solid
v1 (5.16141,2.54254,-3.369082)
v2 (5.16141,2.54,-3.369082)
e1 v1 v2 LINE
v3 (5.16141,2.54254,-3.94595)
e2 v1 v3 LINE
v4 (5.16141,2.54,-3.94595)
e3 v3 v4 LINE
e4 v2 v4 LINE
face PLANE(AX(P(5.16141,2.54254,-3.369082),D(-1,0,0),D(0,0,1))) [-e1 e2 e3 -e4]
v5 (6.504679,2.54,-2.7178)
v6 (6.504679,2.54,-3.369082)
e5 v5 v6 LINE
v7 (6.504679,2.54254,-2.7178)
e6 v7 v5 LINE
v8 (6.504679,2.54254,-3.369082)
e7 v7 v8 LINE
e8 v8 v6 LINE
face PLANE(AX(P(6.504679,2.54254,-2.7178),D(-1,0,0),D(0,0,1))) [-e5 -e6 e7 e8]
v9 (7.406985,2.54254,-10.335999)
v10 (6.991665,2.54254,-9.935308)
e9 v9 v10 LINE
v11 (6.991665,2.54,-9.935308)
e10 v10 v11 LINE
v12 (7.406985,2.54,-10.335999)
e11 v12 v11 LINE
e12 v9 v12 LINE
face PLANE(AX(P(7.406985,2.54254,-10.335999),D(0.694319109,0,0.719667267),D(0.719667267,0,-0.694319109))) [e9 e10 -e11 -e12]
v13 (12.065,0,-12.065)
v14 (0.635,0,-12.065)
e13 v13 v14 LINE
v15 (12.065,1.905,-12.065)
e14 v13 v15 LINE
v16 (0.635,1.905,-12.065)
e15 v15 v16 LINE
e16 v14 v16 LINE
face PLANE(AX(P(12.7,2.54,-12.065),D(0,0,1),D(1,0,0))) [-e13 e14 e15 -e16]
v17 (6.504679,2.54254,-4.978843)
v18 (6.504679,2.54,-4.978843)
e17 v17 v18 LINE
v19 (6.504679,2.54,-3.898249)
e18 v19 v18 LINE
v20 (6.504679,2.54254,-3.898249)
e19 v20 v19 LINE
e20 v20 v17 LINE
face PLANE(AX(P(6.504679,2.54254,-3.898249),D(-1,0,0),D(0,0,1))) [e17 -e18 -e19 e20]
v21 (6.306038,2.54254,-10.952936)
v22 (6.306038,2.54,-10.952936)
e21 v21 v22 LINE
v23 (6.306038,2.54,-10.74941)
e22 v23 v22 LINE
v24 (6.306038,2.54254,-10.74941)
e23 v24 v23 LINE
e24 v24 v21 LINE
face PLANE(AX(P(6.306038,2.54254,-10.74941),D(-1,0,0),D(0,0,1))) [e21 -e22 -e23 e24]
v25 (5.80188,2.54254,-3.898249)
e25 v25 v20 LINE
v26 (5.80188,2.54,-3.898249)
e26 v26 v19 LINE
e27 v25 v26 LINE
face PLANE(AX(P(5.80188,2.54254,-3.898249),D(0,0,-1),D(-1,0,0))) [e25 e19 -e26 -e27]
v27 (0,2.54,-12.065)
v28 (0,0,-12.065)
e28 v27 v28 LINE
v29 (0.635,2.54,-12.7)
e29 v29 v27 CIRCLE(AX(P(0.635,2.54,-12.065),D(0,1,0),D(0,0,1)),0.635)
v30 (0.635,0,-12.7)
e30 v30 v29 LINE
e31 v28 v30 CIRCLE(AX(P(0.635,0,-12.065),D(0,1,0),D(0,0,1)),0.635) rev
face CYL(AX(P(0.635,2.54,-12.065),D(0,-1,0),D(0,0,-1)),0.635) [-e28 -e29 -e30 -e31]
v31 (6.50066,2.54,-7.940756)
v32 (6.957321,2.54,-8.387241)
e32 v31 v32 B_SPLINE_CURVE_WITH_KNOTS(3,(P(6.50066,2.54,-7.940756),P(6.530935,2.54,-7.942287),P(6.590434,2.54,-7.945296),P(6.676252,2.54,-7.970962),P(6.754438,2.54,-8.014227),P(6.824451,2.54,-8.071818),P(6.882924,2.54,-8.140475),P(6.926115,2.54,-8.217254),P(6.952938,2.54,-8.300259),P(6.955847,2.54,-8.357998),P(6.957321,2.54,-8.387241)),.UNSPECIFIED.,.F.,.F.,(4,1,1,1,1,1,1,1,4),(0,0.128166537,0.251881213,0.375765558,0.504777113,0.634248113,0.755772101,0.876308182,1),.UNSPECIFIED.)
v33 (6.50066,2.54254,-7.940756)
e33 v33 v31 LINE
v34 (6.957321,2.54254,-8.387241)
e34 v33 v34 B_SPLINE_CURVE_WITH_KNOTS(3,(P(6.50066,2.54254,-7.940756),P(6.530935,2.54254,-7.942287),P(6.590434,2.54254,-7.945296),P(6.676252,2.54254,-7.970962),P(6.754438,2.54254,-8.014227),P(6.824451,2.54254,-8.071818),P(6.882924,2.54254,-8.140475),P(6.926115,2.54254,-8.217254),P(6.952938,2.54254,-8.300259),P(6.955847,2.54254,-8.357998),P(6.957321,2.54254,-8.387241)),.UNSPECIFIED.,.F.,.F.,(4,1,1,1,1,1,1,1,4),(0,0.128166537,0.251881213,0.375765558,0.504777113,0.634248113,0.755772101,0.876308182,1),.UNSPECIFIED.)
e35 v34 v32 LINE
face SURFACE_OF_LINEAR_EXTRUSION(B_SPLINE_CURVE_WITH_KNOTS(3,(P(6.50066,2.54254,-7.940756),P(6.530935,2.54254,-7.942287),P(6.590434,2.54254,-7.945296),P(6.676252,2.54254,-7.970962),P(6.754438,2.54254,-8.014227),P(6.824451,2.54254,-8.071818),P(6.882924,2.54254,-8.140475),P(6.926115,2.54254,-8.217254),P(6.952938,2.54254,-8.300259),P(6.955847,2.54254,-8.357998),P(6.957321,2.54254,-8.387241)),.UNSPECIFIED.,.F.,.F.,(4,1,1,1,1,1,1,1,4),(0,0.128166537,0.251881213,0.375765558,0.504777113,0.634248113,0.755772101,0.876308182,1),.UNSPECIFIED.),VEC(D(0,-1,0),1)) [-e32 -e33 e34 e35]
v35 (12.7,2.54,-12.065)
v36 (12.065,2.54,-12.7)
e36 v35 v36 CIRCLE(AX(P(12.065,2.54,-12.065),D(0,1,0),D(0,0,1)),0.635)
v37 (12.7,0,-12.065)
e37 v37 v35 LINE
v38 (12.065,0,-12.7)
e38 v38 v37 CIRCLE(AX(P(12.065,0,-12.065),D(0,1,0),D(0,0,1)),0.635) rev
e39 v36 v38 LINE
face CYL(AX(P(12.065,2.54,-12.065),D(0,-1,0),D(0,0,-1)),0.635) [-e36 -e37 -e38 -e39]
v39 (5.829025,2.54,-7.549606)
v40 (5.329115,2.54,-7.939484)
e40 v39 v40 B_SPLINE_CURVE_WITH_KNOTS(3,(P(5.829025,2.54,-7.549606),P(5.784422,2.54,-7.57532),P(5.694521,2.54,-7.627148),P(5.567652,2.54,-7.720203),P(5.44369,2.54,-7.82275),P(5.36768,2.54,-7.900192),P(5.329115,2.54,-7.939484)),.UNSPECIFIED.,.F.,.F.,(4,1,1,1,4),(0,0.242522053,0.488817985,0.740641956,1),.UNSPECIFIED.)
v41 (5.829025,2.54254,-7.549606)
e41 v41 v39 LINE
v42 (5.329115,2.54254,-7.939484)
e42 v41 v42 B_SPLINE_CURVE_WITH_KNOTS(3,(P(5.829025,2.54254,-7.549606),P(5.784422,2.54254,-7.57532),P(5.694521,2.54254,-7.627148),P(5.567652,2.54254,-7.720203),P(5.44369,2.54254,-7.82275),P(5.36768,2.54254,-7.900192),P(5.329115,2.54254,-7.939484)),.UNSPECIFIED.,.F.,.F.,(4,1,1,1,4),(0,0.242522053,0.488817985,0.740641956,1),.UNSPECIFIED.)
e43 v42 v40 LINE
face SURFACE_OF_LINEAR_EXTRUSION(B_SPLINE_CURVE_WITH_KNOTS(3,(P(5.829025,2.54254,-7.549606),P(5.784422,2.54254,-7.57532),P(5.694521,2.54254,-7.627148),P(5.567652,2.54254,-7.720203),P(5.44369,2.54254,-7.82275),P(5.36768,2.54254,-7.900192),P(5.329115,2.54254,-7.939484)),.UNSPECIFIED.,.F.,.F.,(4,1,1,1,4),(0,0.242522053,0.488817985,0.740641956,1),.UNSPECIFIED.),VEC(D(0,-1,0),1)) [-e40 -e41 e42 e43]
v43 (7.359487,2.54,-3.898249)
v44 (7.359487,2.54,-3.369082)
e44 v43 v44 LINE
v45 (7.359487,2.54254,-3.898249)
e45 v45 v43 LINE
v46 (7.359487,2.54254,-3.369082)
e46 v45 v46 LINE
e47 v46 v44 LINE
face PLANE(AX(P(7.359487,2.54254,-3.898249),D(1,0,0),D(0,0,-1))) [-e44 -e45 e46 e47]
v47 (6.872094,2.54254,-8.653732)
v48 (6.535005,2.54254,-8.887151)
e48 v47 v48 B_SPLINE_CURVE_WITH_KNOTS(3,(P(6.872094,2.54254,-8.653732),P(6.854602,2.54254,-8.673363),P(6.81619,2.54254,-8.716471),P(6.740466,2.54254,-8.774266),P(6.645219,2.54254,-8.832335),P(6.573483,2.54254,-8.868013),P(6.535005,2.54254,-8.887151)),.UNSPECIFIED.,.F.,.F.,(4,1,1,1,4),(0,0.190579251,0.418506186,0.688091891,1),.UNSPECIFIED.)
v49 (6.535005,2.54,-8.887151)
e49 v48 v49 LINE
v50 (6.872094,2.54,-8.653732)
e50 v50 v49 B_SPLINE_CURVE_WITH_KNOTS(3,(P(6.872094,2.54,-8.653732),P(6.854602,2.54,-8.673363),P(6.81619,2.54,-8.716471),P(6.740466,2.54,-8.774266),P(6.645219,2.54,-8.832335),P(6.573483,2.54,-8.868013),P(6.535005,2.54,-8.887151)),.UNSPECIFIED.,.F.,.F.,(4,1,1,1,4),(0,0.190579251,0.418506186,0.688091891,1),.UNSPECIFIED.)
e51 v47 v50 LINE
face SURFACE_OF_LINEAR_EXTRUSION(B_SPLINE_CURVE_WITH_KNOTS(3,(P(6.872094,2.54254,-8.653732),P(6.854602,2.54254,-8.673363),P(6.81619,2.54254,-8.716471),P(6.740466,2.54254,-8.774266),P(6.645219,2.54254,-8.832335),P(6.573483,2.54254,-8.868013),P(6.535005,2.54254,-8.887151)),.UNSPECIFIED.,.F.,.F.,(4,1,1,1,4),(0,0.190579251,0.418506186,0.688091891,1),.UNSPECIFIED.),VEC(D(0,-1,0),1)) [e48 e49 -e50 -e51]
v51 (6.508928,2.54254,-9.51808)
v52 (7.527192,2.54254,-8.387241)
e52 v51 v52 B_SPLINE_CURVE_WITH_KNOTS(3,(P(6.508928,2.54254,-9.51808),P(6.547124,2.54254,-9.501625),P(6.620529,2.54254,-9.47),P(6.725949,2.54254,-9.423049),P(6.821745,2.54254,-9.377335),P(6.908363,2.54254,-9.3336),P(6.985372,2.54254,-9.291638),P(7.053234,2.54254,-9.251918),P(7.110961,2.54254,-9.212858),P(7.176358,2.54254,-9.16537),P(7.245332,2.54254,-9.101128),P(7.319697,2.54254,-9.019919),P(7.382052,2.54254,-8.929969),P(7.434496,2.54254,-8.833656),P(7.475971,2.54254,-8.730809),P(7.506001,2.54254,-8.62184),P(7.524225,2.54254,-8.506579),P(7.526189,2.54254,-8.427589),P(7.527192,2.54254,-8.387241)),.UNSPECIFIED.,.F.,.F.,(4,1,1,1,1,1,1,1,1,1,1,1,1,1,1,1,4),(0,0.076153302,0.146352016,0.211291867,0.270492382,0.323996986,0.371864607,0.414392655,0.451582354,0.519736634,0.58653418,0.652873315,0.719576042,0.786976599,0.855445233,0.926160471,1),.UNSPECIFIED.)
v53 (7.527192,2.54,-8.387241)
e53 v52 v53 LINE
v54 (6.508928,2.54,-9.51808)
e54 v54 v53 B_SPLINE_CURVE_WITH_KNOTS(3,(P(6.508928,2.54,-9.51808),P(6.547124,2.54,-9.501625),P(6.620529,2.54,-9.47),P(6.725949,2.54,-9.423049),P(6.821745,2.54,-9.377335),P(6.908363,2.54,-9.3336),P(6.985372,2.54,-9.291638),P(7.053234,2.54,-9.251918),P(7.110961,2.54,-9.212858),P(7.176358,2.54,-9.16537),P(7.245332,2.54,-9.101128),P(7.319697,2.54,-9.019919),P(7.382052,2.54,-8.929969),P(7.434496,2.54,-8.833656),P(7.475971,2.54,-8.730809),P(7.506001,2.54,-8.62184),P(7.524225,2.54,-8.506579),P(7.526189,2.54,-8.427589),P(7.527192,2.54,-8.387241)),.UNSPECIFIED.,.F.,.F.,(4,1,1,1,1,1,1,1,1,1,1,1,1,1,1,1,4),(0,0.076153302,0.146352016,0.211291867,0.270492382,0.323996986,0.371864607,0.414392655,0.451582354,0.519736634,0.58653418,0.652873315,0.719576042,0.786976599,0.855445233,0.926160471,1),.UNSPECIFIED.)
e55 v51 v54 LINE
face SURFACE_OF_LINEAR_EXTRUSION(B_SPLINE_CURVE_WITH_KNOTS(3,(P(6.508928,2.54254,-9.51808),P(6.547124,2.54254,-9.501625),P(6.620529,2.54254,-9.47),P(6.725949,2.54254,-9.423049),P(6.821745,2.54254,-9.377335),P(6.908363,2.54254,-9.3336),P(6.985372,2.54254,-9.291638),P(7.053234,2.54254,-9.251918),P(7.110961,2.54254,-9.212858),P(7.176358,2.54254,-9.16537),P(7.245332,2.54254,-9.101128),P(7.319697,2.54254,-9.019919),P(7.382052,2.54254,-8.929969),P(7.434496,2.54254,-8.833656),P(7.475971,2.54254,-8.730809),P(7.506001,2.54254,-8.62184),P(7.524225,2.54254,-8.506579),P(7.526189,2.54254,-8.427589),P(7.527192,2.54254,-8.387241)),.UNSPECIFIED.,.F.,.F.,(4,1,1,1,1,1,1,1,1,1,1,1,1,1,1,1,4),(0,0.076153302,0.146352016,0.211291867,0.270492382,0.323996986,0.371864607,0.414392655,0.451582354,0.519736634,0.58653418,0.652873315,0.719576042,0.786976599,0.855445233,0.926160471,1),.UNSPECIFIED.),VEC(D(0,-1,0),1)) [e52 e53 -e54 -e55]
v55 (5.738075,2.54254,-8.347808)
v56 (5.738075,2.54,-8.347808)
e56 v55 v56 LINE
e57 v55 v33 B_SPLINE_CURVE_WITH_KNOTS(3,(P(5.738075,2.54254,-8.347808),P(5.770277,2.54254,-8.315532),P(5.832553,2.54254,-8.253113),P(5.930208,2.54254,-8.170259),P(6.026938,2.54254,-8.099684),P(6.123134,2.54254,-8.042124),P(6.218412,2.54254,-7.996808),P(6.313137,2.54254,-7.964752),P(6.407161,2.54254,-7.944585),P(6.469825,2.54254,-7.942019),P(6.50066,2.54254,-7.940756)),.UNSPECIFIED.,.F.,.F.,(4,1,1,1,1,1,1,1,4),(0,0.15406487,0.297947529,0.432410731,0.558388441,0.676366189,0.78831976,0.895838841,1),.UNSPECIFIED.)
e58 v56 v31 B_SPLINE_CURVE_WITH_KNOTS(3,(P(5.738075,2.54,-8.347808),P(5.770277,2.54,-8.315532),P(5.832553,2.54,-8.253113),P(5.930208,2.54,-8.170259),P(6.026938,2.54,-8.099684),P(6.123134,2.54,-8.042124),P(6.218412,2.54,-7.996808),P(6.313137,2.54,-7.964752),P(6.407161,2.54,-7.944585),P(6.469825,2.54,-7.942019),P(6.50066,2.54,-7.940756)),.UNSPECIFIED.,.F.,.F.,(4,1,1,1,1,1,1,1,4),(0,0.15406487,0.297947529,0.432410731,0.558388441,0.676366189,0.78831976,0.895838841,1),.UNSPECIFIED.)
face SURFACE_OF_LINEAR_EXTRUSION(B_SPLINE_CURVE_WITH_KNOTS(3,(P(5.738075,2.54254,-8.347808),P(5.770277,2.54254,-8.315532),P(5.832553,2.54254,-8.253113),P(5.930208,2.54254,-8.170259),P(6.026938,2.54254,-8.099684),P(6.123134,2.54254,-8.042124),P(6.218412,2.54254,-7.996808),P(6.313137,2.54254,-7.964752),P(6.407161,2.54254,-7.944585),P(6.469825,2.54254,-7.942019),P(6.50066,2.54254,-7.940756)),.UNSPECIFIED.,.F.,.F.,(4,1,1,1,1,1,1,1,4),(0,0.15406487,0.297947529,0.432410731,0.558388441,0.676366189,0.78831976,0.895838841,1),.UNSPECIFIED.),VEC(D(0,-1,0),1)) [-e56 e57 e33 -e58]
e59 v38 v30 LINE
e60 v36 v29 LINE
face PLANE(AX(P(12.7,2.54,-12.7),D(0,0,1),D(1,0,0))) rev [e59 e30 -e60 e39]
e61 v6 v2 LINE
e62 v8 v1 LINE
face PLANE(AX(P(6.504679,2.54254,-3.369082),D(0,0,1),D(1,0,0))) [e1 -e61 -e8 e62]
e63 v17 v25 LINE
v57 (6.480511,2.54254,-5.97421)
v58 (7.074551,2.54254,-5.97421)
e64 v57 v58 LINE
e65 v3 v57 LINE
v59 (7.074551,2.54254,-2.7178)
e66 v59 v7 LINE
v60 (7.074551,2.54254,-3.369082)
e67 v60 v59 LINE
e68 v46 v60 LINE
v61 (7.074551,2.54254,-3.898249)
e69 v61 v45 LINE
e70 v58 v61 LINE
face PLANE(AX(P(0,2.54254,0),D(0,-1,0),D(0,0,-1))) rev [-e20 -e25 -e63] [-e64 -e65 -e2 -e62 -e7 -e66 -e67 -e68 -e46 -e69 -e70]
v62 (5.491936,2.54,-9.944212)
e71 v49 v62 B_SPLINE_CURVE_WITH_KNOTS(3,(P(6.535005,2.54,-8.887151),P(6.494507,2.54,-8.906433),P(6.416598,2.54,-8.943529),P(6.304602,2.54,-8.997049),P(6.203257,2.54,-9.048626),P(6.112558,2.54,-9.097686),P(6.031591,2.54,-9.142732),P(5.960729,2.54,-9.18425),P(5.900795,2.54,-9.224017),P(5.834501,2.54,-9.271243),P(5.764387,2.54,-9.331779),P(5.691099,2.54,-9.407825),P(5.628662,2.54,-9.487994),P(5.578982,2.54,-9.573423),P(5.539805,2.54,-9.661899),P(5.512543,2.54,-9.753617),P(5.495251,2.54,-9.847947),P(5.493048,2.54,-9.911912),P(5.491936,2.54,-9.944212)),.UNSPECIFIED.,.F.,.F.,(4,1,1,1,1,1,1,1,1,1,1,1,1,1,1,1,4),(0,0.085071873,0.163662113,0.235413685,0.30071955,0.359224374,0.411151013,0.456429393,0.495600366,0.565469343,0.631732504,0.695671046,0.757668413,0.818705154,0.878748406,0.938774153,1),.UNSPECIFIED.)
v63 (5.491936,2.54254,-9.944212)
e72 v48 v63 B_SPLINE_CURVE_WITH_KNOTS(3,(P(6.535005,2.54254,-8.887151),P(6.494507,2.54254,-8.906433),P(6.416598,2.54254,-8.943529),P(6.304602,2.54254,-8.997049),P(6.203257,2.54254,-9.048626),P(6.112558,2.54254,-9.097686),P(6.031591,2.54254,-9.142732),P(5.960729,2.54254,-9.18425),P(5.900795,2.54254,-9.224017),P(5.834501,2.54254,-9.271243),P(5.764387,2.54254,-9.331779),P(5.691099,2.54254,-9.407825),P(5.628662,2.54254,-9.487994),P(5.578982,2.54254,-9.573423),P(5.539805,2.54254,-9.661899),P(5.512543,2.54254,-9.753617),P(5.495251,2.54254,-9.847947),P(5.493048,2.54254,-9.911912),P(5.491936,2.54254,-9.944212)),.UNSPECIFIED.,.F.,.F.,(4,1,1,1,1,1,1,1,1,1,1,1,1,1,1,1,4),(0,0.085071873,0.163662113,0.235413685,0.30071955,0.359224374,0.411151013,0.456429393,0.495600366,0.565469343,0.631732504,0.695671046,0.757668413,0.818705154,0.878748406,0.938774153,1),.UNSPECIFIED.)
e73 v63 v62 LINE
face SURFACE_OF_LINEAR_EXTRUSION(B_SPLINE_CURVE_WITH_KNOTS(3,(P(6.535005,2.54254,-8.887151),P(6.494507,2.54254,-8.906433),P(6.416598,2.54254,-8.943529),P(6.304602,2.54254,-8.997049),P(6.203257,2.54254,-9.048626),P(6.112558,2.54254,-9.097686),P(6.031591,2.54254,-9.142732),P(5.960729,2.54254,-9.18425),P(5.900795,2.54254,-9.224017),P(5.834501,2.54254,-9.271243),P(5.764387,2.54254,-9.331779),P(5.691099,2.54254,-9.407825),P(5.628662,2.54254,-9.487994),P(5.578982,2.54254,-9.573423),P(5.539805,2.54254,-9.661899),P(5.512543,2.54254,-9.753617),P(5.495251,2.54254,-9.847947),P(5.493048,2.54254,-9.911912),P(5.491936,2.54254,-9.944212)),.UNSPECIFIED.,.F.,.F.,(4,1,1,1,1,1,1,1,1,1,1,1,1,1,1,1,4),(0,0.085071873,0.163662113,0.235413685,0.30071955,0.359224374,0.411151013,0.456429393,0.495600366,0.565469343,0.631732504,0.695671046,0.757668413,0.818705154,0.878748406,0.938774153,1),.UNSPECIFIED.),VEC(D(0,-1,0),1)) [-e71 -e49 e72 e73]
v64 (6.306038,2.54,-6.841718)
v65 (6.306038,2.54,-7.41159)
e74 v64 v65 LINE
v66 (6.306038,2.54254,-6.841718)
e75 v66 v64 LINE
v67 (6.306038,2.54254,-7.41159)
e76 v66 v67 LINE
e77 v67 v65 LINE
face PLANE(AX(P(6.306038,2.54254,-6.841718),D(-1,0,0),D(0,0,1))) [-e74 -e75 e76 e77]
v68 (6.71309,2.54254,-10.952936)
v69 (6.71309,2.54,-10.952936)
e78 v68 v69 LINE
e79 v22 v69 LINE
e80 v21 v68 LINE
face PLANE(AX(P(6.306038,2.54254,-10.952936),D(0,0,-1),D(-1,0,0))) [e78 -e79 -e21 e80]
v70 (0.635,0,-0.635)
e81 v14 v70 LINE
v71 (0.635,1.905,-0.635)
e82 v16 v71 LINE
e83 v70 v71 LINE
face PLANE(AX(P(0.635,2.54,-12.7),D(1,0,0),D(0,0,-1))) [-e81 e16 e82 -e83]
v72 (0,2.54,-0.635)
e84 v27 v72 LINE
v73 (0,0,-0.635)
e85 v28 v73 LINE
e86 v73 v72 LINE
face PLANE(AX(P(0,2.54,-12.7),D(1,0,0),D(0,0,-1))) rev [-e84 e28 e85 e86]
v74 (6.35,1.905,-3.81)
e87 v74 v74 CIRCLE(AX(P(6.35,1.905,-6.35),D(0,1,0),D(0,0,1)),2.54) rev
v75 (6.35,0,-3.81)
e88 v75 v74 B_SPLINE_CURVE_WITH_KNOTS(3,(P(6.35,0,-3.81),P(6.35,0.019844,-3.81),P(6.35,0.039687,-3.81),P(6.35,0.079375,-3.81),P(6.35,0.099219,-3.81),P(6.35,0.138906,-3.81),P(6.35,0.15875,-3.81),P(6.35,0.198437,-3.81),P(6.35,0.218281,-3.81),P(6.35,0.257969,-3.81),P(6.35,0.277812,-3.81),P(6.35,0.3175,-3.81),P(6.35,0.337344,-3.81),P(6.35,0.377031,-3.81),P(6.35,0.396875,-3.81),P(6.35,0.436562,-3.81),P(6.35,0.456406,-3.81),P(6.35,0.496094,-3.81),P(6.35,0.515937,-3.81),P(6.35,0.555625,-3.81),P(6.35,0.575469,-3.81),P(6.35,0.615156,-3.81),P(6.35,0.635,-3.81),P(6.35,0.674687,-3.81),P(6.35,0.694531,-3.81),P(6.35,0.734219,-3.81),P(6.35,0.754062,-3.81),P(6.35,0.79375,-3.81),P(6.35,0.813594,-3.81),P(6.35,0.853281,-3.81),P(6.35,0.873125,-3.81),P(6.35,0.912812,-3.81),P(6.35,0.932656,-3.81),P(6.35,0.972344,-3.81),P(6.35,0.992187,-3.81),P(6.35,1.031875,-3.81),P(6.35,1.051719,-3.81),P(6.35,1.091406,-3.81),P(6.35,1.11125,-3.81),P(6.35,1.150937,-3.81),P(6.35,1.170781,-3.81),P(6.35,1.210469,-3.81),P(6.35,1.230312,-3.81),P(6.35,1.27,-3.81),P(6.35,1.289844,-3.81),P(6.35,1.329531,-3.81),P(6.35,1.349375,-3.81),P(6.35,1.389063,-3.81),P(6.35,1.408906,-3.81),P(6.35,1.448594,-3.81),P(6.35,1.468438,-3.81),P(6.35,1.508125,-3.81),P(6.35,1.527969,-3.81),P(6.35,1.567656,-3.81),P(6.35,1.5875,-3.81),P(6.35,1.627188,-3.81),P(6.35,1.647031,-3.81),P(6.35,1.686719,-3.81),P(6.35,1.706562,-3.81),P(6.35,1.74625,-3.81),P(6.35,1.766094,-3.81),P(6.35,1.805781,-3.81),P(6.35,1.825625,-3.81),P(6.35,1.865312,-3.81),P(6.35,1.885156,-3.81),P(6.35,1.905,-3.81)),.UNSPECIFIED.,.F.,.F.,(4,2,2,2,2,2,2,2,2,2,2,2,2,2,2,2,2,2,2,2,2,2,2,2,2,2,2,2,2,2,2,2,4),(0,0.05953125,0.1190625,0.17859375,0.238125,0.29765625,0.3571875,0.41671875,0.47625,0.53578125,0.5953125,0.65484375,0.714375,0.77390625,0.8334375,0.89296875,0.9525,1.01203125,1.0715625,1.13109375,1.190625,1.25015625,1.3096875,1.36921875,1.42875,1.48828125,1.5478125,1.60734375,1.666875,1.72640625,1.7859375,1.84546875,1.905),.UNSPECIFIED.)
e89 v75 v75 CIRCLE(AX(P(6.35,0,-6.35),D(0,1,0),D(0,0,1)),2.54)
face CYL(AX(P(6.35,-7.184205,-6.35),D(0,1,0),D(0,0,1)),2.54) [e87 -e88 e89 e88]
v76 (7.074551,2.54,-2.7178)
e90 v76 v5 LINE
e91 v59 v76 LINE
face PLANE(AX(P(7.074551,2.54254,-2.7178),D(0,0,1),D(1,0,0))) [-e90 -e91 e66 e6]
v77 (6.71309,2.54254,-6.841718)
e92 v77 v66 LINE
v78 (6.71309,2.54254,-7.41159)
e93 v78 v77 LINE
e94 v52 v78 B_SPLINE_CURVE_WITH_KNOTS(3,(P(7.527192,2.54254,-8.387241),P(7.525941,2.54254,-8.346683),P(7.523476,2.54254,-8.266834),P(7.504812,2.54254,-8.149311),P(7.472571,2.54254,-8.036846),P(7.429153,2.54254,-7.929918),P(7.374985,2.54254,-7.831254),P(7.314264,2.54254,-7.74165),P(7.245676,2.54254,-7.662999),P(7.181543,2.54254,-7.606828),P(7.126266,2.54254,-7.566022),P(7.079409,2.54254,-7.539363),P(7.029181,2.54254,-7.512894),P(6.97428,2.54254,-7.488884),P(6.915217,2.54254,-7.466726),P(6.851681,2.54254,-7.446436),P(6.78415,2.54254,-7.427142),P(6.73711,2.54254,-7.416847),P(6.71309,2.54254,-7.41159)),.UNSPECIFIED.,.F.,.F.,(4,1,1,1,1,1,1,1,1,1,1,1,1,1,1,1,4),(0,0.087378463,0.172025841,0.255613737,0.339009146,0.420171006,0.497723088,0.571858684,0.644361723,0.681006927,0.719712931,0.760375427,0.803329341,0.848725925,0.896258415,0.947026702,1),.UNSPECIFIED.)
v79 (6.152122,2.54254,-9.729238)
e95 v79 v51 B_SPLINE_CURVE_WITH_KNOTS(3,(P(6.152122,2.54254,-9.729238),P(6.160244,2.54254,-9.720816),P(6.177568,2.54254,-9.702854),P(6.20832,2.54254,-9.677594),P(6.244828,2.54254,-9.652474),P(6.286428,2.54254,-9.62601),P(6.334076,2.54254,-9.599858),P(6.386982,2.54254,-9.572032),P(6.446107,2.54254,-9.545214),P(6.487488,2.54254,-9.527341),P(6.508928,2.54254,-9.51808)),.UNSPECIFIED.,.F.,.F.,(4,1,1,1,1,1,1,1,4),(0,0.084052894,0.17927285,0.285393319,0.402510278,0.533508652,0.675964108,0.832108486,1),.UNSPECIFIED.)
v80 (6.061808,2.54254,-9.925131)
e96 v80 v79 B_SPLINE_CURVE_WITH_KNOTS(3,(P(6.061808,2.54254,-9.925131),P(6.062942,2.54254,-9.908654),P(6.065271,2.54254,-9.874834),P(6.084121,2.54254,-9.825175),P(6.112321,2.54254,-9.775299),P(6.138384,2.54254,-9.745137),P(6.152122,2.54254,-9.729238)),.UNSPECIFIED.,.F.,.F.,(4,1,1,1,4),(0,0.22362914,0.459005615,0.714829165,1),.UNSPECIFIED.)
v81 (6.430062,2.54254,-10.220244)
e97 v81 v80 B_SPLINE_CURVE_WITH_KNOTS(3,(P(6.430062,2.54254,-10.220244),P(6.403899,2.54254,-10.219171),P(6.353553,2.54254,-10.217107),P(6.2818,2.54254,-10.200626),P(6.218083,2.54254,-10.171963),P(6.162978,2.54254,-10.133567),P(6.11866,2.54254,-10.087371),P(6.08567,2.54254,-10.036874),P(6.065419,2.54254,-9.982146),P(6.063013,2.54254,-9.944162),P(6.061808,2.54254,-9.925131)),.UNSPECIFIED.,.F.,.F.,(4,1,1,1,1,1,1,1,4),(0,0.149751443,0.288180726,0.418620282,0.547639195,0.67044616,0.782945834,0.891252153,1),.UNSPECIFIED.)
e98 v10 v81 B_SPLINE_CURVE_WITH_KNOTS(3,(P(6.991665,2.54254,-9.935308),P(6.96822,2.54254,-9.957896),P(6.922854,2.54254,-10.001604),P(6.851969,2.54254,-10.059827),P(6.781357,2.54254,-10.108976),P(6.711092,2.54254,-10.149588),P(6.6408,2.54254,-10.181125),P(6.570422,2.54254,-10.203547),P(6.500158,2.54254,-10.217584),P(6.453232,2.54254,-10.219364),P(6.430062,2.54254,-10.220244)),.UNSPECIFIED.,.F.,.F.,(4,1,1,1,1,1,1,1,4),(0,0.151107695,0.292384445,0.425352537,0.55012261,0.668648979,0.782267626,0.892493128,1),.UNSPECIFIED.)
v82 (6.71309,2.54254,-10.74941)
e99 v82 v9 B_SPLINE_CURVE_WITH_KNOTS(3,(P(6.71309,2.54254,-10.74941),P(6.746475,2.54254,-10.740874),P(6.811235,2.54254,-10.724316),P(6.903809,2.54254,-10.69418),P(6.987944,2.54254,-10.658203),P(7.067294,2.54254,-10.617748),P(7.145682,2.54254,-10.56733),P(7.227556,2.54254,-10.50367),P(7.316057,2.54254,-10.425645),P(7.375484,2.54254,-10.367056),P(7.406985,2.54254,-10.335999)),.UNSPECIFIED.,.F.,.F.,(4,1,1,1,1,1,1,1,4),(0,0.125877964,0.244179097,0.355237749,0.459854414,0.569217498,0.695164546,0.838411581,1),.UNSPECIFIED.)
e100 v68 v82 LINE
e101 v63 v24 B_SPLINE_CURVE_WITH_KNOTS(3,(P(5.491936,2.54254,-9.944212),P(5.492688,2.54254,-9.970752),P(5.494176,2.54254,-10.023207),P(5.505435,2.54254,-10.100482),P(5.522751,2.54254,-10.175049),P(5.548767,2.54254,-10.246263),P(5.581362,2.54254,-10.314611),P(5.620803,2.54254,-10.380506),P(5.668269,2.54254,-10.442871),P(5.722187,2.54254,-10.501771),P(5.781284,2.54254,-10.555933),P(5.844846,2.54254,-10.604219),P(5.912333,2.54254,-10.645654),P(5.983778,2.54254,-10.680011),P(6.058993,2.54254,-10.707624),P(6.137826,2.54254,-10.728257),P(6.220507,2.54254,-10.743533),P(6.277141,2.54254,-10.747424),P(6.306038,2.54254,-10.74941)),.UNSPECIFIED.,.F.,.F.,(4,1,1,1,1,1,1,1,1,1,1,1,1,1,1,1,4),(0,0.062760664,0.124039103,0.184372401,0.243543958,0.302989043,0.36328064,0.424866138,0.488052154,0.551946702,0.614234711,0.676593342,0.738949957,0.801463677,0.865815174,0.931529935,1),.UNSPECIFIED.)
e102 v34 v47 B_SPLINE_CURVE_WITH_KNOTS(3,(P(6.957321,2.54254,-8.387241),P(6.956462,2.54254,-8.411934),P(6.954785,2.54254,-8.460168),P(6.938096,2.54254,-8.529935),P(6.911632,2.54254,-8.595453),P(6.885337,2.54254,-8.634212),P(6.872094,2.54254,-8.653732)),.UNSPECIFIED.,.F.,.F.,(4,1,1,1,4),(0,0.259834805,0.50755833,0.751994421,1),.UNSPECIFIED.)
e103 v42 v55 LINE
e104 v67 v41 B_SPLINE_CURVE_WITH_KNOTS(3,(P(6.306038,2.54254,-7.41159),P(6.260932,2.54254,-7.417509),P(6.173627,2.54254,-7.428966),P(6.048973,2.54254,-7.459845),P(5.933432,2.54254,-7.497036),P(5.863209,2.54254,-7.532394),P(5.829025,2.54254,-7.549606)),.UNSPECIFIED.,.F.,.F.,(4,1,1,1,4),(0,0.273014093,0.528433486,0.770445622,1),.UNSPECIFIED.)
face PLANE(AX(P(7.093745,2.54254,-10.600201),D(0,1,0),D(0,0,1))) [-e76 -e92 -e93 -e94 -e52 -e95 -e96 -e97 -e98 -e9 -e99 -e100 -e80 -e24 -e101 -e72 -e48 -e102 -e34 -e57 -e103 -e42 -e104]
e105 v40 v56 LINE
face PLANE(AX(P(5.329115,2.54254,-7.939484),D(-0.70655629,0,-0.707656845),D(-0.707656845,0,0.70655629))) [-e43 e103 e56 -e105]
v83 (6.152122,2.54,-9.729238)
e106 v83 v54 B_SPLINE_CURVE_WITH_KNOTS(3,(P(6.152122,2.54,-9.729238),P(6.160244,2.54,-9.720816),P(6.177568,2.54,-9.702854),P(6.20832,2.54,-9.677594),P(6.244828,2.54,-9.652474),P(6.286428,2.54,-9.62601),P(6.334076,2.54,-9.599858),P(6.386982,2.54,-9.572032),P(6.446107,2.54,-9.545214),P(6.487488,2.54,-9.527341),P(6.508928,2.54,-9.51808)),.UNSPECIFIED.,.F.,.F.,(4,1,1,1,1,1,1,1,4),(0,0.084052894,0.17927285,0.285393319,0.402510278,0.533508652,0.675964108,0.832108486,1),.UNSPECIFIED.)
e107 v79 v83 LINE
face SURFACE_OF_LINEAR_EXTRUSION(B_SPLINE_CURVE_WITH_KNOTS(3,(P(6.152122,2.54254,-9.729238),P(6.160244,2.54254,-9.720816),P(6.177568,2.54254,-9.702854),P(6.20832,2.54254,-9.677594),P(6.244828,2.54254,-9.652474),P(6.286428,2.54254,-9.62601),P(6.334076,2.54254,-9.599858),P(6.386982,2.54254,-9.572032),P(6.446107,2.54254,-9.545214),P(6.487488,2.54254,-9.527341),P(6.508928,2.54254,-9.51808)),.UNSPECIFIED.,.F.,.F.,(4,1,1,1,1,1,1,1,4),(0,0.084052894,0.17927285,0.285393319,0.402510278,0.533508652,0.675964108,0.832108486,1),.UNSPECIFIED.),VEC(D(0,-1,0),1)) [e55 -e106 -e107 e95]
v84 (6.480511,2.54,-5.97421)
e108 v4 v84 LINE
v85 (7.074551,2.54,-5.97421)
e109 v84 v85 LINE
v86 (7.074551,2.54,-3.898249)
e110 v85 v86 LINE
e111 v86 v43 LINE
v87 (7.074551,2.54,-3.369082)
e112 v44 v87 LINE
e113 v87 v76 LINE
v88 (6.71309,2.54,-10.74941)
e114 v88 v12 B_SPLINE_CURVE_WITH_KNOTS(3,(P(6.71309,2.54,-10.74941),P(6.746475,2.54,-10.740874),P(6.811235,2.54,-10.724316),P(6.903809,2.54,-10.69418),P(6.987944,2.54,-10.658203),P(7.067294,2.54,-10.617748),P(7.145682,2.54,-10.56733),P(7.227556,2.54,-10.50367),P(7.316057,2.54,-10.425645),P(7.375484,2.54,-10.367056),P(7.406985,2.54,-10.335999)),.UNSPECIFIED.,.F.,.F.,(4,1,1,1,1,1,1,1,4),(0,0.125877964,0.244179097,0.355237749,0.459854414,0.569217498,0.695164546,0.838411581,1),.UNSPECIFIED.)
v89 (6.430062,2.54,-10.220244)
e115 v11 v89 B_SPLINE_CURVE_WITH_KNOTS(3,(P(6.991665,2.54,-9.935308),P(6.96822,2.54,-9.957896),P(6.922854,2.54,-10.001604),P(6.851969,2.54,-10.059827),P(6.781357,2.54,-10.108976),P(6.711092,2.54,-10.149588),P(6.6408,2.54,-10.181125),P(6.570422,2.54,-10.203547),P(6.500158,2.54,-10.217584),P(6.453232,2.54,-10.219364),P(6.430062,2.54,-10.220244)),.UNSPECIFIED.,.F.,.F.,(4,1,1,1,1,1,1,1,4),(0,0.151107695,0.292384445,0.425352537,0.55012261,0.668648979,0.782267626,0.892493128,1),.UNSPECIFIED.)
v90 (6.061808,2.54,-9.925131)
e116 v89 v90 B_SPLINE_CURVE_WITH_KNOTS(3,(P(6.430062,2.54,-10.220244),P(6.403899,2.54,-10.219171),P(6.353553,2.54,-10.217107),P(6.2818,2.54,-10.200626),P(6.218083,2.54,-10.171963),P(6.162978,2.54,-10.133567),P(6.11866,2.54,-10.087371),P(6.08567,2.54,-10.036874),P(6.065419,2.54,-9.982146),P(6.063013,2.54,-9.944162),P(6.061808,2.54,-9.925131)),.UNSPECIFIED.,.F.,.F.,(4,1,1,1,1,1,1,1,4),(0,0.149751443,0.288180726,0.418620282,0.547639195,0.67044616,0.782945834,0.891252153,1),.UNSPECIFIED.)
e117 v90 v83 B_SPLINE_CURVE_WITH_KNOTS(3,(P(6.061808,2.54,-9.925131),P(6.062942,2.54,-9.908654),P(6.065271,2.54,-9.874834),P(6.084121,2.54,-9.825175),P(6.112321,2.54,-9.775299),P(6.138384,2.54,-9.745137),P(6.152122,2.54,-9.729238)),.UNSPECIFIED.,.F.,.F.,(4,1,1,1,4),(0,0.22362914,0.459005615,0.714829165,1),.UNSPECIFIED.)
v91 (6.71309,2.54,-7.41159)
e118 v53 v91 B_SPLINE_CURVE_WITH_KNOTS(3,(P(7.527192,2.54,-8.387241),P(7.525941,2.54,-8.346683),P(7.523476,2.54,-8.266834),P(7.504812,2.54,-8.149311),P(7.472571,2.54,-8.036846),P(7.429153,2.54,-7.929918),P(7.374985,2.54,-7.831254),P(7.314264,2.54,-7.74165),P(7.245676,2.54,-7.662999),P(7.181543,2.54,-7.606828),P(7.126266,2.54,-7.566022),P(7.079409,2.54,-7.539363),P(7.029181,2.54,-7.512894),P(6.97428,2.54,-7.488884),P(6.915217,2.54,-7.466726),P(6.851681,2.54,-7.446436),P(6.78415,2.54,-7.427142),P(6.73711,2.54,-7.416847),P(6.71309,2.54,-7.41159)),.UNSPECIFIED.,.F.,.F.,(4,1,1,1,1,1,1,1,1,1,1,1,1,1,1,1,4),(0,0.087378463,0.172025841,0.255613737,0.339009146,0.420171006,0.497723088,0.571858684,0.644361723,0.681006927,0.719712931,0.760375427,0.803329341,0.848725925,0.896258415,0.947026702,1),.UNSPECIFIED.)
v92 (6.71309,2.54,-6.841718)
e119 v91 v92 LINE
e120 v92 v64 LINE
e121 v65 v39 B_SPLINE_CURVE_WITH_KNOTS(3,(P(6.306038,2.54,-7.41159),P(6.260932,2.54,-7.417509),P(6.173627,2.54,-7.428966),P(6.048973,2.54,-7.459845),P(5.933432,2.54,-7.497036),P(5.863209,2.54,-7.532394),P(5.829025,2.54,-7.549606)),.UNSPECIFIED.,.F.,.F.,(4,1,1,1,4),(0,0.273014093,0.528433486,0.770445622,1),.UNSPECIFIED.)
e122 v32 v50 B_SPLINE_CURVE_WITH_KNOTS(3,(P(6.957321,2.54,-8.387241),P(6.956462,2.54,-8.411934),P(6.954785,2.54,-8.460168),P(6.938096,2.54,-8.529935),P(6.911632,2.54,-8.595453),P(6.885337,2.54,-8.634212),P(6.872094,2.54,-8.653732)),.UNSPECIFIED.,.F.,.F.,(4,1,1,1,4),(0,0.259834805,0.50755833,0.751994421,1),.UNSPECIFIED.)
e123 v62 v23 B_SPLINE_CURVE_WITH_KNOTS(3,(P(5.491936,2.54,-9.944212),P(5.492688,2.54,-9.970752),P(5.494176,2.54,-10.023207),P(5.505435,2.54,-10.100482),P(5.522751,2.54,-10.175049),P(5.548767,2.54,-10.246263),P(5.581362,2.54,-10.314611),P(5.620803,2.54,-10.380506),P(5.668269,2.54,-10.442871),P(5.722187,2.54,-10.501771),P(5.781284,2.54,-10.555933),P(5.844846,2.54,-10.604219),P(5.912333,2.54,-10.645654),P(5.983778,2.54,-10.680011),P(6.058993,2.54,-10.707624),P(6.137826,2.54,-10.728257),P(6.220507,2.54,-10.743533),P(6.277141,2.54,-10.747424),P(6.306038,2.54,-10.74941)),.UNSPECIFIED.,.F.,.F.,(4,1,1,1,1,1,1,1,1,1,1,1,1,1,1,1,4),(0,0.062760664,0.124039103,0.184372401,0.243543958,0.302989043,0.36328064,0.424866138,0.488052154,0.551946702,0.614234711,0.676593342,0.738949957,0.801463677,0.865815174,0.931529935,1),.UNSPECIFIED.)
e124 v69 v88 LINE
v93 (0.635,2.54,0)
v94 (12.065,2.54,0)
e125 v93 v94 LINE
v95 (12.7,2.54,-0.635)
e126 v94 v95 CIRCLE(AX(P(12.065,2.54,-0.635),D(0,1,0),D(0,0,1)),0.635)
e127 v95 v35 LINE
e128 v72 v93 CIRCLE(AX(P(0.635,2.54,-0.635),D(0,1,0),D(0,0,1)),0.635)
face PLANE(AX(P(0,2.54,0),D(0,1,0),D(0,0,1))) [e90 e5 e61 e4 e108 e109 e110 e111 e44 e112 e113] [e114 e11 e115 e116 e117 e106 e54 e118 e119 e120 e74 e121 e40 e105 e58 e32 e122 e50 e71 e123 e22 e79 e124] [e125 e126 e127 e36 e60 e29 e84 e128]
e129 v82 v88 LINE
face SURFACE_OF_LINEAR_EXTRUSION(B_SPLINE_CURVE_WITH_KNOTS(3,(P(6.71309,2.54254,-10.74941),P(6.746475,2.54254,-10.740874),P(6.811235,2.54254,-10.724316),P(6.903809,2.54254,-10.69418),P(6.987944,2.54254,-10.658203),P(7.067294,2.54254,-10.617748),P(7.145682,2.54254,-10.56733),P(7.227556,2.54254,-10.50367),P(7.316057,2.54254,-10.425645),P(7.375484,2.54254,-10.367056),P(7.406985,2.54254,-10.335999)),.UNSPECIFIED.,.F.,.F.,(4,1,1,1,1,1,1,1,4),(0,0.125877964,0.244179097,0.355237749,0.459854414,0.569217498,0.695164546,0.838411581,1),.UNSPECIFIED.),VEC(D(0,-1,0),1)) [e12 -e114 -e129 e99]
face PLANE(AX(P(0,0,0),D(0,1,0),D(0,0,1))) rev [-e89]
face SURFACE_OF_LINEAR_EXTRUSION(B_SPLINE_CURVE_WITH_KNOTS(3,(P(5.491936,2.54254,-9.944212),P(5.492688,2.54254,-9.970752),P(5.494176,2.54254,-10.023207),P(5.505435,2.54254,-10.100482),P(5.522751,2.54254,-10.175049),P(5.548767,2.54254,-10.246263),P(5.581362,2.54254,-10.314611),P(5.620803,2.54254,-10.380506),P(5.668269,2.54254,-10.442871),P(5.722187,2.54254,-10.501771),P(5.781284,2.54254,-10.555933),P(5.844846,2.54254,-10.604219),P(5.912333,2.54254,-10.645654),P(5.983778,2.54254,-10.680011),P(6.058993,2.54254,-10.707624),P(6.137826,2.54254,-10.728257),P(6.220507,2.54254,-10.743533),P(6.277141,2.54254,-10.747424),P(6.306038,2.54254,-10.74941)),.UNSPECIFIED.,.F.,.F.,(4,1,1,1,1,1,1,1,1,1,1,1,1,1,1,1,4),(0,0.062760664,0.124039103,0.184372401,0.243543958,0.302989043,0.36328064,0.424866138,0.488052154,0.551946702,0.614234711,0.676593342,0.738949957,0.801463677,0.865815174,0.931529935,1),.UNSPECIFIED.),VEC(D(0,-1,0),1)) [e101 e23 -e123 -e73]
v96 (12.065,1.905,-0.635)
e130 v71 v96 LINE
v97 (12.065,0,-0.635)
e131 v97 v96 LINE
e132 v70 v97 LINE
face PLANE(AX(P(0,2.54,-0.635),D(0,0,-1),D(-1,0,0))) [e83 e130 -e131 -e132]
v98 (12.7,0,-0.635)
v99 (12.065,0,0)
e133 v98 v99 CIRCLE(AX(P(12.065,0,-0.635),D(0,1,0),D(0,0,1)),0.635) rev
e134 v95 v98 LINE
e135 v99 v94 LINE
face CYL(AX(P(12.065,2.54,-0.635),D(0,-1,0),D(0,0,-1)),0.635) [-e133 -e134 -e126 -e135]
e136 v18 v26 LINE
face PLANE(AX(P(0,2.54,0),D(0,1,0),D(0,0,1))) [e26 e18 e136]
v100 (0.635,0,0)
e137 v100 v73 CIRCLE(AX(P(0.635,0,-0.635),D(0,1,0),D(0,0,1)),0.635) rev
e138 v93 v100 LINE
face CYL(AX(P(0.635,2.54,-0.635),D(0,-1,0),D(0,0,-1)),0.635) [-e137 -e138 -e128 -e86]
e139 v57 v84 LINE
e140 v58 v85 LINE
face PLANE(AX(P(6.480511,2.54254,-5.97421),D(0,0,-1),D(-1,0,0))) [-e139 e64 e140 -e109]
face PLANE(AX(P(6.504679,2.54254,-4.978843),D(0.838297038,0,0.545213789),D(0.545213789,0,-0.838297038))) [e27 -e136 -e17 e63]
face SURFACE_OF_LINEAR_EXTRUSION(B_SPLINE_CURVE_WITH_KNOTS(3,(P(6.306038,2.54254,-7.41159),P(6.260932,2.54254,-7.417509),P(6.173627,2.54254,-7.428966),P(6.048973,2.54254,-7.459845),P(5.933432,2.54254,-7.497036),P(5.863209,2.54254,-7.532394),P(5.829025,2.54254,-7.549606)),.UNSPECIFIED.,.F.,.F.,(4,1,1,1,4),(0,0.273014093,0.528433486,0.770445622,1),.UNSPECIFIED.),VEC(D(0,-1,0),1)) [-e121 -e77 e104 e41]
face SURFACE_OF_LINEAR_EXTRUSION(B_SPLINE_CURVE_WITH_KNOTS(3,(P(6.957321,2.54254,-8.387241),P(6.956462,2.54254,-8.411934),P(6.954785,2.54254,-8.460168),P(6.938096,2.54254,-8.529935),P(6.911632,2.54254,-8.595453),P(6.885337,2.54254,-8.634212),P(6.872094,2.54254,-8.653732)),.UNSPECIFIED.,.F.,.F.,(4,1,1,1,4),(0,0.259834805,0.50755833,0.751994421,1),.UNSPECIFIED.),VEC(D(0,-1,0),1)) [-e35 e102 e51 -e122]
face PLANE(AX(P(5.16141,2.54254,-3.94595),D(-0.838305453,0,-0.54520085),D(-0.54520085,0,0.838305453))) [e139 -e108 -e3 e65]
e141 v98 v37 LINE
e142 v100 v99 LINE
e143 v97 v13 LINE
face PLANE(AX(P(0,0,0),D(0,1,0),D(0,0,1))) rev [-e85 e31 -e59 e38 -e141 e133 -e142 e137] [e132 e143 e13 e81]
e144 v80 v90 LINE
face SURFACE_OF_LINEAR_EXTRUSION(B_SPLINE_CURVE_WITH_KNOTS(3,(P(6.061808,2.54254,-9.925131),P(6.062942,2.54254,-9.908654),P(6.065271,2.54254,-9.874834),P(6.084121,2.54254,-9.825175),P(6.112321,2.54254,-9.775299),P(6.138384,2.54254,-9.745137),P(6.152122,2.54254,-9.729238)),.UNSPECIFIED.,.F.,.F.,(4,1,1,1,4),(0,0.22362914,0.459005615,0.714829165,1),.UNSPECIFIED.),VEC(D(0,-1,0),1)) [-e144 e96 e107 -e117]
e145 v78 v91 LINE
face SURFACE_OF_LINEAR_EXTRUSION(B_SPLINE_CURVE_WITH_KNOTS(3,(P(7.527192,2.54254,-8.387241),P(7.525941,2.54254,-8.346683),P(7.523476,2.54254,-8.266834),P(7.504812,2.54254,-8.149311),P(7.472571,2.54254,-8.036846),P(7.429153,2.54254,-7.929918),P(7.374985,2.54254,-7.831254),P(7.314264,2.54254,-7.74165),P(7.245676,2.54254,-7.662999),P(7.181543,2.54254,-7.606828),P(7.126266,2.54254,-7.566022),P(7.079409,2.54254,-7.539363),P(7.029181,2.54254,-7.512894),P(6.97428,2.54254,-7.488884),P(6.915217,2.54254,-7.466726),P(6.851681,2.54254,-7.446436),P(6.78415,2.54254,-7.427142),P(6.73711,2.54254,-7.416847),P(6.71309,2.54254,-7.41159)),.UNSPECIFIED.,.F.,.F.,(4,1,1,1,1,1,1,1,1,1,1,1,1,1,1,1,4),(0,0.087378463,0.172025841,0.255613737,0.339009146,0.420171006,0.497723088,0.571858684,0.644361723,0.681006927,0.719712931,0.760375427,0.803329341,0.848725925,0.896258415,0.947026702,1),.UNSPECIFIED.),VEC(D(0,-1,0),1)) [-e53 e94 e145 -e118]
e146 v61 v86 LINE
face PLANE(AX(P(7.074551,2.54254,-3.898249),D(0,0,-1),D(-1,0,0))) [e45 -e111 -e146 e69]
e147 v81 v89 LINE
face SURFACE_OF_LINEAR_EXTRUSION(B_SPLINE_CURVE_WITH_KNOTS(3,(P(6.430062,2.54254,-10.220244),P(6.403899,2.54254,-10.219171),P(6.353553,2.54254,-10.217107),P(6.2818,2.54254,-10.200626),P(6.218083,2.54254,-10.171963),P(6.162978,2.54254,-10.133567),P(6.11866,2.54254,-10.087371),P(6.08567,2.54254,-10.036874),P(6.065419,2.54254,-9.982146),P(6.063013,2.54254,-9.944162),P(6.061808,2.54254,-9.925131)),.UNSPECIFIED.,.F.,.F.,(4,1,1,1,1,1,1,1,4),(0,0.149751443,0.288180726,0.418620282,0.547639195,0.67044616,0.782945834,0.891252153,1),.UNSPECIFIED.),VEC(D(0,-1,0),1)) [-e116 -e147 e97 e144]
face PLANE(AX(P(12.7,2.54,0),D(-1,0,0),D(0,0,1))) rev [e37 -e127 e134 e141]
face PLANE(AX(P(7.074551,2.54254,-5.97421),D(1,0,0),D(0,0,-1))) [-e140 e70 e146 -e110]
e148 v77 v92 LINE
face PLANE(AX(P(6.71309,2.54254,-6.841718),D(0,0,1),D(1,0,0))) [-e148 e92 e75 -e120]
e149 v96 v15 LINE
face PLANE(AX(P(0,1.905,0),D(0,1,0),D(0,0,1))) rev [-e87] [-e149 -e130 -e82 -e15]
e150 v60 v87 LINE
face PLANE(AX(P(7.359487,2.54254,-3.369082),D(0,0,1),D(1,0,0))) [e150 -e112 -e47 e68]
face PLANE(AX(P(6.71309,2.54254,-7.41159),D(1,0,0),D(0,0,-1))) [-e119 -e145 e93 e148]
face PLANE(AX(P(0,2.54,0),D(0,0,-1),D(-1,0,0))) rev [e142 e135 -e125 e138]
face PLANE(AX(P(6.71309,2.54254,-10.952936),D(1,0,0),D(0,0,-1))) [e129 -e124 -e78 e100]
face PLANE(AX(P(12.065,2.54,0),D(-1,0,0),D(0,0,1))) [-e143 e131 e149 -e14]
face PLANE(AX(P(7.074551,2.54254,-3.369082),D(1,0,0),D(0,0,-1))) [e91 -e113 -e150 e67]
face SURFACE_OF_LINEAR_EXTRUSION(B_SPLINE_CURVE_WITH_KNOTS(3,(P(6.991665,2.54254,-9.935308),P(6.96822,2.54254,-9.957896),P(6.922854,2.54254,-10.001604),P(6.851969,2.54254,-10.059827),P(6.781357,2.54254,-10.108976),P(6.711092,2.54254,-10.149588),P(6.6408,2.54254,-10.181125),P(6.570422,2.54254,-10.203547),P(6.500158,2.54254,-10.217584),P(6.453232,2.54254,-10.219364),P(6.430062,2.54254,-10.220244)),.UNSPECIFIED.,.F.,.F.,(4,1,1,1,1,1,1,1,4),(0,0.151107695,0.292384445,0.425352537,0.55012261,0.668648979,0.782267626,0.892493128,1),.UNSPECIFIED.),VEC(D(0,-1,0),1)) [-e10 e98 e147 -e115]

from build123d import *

# Parameters (mm, degrees)
SKETCH1_W           = 12.7
SKETCH1_H           = 12.7
BOSS_EXTRUDE1_DEPTH = 2.54
FILLET1_R           = 0.635
SHELL1_START        = 0.635
SHELL1_OUTLINE_W    = 1.905
SHELL1_OUTLINE_H    = 11.43
SHELL1_DEPTH        = 11.43
SKETCH2_R           = 2.54
BOSS_EXTRUDE2_DEPTH = 1.905
BOSS_EXTRUDE4_DEPTH = 0.00254


# Read off the part's stored shape, not the designer's step: Shell1
with BuildPart() as part:
    # Sketch1 → Boss-Extrude1 (new body)
    with BuildSketch(Plane(origin=(0, 0, 0), x_dir=(1, 0, 0), z_dir=(0, 1, 0))):
        with Locations((6.35, 6.35)):
            Rectangle(SKETCH1_W, SKETCH1_H)
    extrude(amount=BOSS_EXTRUDE1_DEPTH)

    # Fillet1
    fillet1_edges = [part.edges().sort_by_distance(p)[0] for p in [
        (0, 1.27, -12.7),
        (12.7, 1.27, -12.7),
        (12.7, 1.27, 0),
        (0, 1.27, 0),
    ]]
    fillet(fillet1_edges, radius=FILLET1_R)

    # Shell1 outline → Shell1 (cut)
    with BuildSketch(Plane.YZ.offset(SHELL1_START)):
        with Locations((0.9525, -6.35)):
            Rectangle(SHELL1_OUTLINE_W, SHELL1_OUTLINE_H)
    extrude(amount=SHELL1_DEPTH, mode=Mode.SUBTRACT)

    # Sketch2 → Boss-Extrude2 (add)
    with BuildSketch(Plane(origin=(0, 1.905, 0), x_dir=(-1, 0, 0), z_dir=(0, -1, 0))):
        with Locations(Location((-6.35, 6.35, 0), (0, 0, 270))):
            Circle(SKETCH2_R)
    extrude(amount=BOSS_EXTRUDE2_DEPTH)

    # Sketch4 → Boss-Extrude4 (add)
    # profile 1 of 2: a face of its own
    with BuildSketch(Plane(origin=(0, 2.54, 0), x_dir=(1, 0, 0), z_dir=(0, 1, 0))):
        Polygon((6.480510817, 5.974210256), (7.074551282, 5.974210256), (7.074551282, 3.898248718), (7.359487179, 3.898248718), (7.359487179, 3.369082051), (7.074551282, 3.369082051), (7.074551282, 2.7178), (6.504679487, 2.7178), (6.504679487, 3.369082051), (5.161410256, 3.369082051), (5.161410256, 3.94595004), align=None)
        Polygon((6.504679487, 3.898248718), (6.504679487, 4.978842668), (5.801880008, 3.898248718), align=None, mode=Mode.SUBTRACT)
    # profile 2 of 2: a face of its own
    with BuildSketch(Plane(origin=(0, 2.54, 0), x_dir=(1, 0, 0), z_dir=(0, 1, 0))):
        with BuildLine():
            Line((7.406984976, 10.335998798), (6.991665465, 9.935307692))
            add(Edge.make_bspline(
                [(6.991665465, 9.935307692), (6.968220024, 9.957896469), (6.922854486, 10.001604413), (6.851968783, 10.059827369), (6.781357064, 10.108976166), (6.711092446, 10.149588351), (6.640799627, 10.181124743), (6.570421611, 10.203546558), (6.500157891, 10.217583932), (6.453231922, 10.219364448), (6.430061899, 10.22024359)],
                knots=[0, 0, 0, 0, 1.208861562, 2.33907556, 3.402820298, 4.400980881, 5.349191832, 6.258141005, 7.139945025, 8, 8, 8, 8], degree=3))
            add(Edge.make_bspline(
                [(6.430061899, 10.22024359), (6.403899471, 10.219170975), (6.353552661, 10.217106842), (6.281800477, 10.200625662), (6.218083395, 10.171963441), (6.162978001, 10.1335672), (6.118660061, 10.08737089), (6.085670238, 10.036873816), (6.065418702, 9.982146492), (6.063012994, 9.944162193), (6.061807692, 9.92513141)],
                knots=[0, 0, 0, 0, 1.198011544, 2.305445805, 3.348962256, 4.381113563, 5.363569282, 6.263566672, 7.130017225, 8, 8, 8, 8], degree=3))
            add(Edge.make_bspline(
                [(6.061807692, 9.92513141), (6.062942346, 9.908653977), (6.065271259, 9.874833543), (6.08412075, 9.82517461), (6.11232136, 9.775299071), (6.138383978, 9.745137076), (6.152122196, 9.729237981)],
                knots=[0, 0, 0, 0, 0.894516561, 1.836022459, 2.859316659, 4, 4, 4, 4], degree=3))
            add(Edge.make_bspline(
                [(6.152122196, 9.729237981), (6.160244287, 9.720816207), (6.177567552, 9.702853763), (6.208320254, 9.677594331), (6.244828496, 9.652473945), (6.286427709, 9.626009569), (6.334076496, 9.599858268), (6.386982478, 9.572031842), (6.4461068, 9.54521439), (6.487487603, 9.527340869), (6.508928085, 9.518080128)],
                knots=[0, 0, 0, 0, 0.672423156, 1.434182798, 2.28314655, 3.220082228, 4.268069212, 5.407712864, 6.656867891, 8, 8, 8, 8], degree=3))
            add(Edge.make_bspline(
                [(6.508928085, 9.518080128), (6.547123945, 9.501624615), (6.620529049, 9.470000279), (6.725949021, 9.423048644), (6.821745388, 9.377334714), (6.908362629, 9.333599875), (6.985371716, 9.291637921), (7.053234273, 9.251918102), (7.110960799, 9.212858211), (7.176358415, 9.165369813), (7.245332068, 9.101127918), (7.319697388, 9.019919388), (7.382052409, 8.929969443), (7.434496037, 8.833656469), (7.475970735, 8.730809102), (7.506000976, 8.621840061), (7.524224787, 8.506579255), (7.526188983, 8.42758935), (7.527192308, 8.387240785)],
                knots=[0, 0, 0, 0, 1.218452834, 2.341632252, 3.380669879, 4.327878116, 5.183951769, 5.949833714, 6.63028248, 7.225317665, 8.315786147, 9.384546881, 10.445973047, 11.51321668, 12.591625589, 13.68712373, 14.81856753, 16, 16, 16, 16], degree=3))
            add(Edge.make_bspline(
                [(7.527192308, 8.387240785), (7.525940527, 8.346682546), (7.523476092, 8.266833747), (7.504812176, 8.149311253), (7.472571433, 8.036846212), (7.429153295, 7.929917836), (7.374984908, 7.831254365), (7.31426383, 7.741649541), (7.245676289, 7.662999272), (7.181542739, 7.60682825), (7.126266053, 7.566022086), (7.079408572, 7.539362519), (7.029180829, 7.512893987), (6.974279808, 7.488884305), (6.915217227, 7.466725999), (6.851680833, 7.446436031), (6.784149797, 7.427141632), (6.737109705, 7.416846646), (6.713089744, 7.411589744)],
                knots=[0, 0, 0, 0, 1.398055402, 2.752413464, 4.089819795, 5.424146338, 6.722736095, 7.963569404, 9.149738937, 10.309787565, 10.896110825, 11.515406893, 12.166006826, 12.853269453, 13.579614796, 14.340134636, 15.152427224, 16, 16, 16, 16], degree=3))
            Line((6.713089744, 7.411589744), (6.713089744, 6.841717949))
            Line((6.713089744, 6.841717949), (6.306038462, 6.841717949))
            Line((6.306038462, 6.841717949), (6.306038462, 7.411589744))
            add(Edge.make_bspline(
                [(6.306038462, 7.411589744), (6.260932407, 7.417508865), (6.173627208, 7.428965643), (6.048973026, 7.459844727), (5.933431761, 7.497036363), (5.863209037, 7.532393856), (5.82902524, 7.549605569)],
                knots=[0, 0, 0, 0, 1.092056374, 2.113733945, 3.081782489, 4, 4, 4, 4], degree=3))
            add(Edge.make_bspline(
                [(5.82902524, 7.549605569), (5.784421922, 7.575319651), (5.694521215, 7.627147952), (5.567652028, 7.720202965), (5.443690251, 7.822749518), (5.367680431, 7.900192292), (5.329115385, 7.939484375)],
                knots=[0, 0, 0, 0, 0.970088211, 1.955271939, 2.962567826, 4, 4, 4, 4], degree=3))
            Line((5.329115385, 7.939484375), (5.73807472, 8.347807692))
            add(Edge.make_bspline(
                [(5.73807472, 8.347807692), (5.770276914, 8.315531916), (5.832553047, 8.253113482), (5.930208341, 8.170258717), (6.026937688, 8.099683859), (6.123133593, 8.042123916), (6.21841229, 7.996807875), (6.313137257, 7.964752249), (6.40716107, 7.944584507), (6.469824943, 7.942018876), (6.500659856, 7.94075641)],
                knots=[0, 0, 0, 0, 1.232518957, 2.38358023, 3.459285847, 4.467107529, 5.410929513, 6.306558082, 7.166710731, 8, 8, 8, 8], degree=3))
            add(Edge.make_bspline(
                [(6.500659856, 7.94075641), (6.530935033, 7.942287354), (6.590433781, 7.945296064), (6.676251693, 7.970961733), (6.754438188, 8.014226678), (6.824451013, 8.071818039), (6.882924302, 8.140474874), (6.926114925, 8.217254316), (6.952937787, 8.300259042), (6.955847074, 8.357998183), (6.957320513, 8.387240785)],
                knots=[0, 0, 0, 0, 1.025332292, 2.015049702, 3.006124463, 4.038216902, 5.073984904, 6.04617681, 7.010465453, 8, 8, 8, 8], degree=3))
            add(Edge.make_bspline(
                [(6.957320513, 8.387240785), (6.95646201, 8.411933563), (6.954785019, 8.460168152), (6.938095616, 8.529934505), (6.911632454, 8.595452748), (6.88533712, 8.634212047), (6.872094151, 8.653732171)],
                knots=[0, 0, 0, 0, 1.039339221, 2.030233321, 3.007977686, 4, 4, 4, 4], degree=3))
            add(Edge.make_bspline(
                [(6.872094151, 8.653732171), (6.85460202, 8.673362669), (6.816189839, 8.716470638), (6.740466296, 8.774265663), (6.645219094, 8.832335499), (6.573483267, 8.868013356), (6.535004808, 8.887150641)],
                knots=[0, 0, 0, 0, 0.762317005, 1.674024744, 2.752367564, 4, 4, 4, 4], degree=3))
            add(Edge.make_bspline(
                [(6.535004808, 8.887150641), (6.494507252, 8.906433078), (6.416597652, 8.943528822), (6.304602291, 8.997049085), (6.203256868, 9.048626278), (6.112557984, 9.097686427), (6.03159058, 9.142731993), (5.960729388, 9.184249859), (5.900795306, 9.224016823), (5.83450108, 9.27124253), (5.764387026, 9.331778858), (5.691098847, 9.407825341), (5.628662473, 9.487993783), (5.578981708, 9.573423124), (5.539805424, 9.661899474), (5.512543165, 9.753617062), (5.495251156, 9.847946671), (5.493048251, 9.91191248), (5.491935897, 9.944211939)],
                knots=[0, 0, 0, 0, 1.361149963, 2.618593809, 3.766618961, 4.811512794, 5.747589985, 6.578416214, 7.302870291, 7.929605856, 9.047509489, 10.107720061, 11.130736737, 12.122694611, 13.099282469, 14.059974503, 15.020386449, 16, 16, 16, 16], degree=3))
            add(Edge.make_bspline(
                [(5.491935897, 9.944211939), (5.492688489, 9.970752491), (5.494175897, 10.023206783), (5.505434517, 10.100481592), (5.522750824, 10.175049255), (5.548766759, 10.246263408), (5.581362042, 10.314610672), (5.620802687, 10.380506472), (5.6682686, 10.442870868), (5.722186861, 10.501770993), (5.78128424, 10.555933143), (5.844845686, 10.604219102), (5.912333412, 10.645653847), (5.983778264, 10.680011213), (6.058992906, 10.707624067), (6.137825565, 10.728257196), (6.220507462, 10.743532862), (6.277140501, 10.747424489), (6.306038462, 10.749410256)],
                knots=[0, 0, 0, 0, 1.004170626, 1.984625641, 2.949958411, 3.896703334, 4.847824684, 5.812490235, 6.7978582, 7.808834457, 8.831147227, 9.827755371, 10.825493475, 11.823199312, 12.823418834, 13.853042784, 14.904478961, 16, 16, 16, 16], degree=3))
            Line((6.306038462, 10.749410256), (6.306038462, 10.952935897))
            Line((6.306038462, 10.952935897), (6.713089744, 10.952935897))
            Line((6.713089744, 10.952935897), (6.713089744, 10.749410256))
            add(Edge.make_bspline(
                [(6.713089744, 10.749410256), (6.746474507, 10.740874198), (6.811234543, 10.724315883), (6.903809354, 10.69417972), (6.987944372, 10.65820288), (7.067293727, 10.617748164), (7.145681965, 10.56733025), (7.227556159, 10.503669804), (7.31605682, 10.425644759), (7.375483722, 10.367055847), (7.406984976, 10.335998798)],
                knots=[0, 0, 0, 0, 1.007023709, 1.953432773, 2.841901989, 3.678835315, 4.553739984, 5.561316369, 6.707292646, 8, 8, 8, 8], degree=3))
        make_face()
    extrude(amount=BOSS_EXTRUDE4_DEPTH)


solid = part.part
